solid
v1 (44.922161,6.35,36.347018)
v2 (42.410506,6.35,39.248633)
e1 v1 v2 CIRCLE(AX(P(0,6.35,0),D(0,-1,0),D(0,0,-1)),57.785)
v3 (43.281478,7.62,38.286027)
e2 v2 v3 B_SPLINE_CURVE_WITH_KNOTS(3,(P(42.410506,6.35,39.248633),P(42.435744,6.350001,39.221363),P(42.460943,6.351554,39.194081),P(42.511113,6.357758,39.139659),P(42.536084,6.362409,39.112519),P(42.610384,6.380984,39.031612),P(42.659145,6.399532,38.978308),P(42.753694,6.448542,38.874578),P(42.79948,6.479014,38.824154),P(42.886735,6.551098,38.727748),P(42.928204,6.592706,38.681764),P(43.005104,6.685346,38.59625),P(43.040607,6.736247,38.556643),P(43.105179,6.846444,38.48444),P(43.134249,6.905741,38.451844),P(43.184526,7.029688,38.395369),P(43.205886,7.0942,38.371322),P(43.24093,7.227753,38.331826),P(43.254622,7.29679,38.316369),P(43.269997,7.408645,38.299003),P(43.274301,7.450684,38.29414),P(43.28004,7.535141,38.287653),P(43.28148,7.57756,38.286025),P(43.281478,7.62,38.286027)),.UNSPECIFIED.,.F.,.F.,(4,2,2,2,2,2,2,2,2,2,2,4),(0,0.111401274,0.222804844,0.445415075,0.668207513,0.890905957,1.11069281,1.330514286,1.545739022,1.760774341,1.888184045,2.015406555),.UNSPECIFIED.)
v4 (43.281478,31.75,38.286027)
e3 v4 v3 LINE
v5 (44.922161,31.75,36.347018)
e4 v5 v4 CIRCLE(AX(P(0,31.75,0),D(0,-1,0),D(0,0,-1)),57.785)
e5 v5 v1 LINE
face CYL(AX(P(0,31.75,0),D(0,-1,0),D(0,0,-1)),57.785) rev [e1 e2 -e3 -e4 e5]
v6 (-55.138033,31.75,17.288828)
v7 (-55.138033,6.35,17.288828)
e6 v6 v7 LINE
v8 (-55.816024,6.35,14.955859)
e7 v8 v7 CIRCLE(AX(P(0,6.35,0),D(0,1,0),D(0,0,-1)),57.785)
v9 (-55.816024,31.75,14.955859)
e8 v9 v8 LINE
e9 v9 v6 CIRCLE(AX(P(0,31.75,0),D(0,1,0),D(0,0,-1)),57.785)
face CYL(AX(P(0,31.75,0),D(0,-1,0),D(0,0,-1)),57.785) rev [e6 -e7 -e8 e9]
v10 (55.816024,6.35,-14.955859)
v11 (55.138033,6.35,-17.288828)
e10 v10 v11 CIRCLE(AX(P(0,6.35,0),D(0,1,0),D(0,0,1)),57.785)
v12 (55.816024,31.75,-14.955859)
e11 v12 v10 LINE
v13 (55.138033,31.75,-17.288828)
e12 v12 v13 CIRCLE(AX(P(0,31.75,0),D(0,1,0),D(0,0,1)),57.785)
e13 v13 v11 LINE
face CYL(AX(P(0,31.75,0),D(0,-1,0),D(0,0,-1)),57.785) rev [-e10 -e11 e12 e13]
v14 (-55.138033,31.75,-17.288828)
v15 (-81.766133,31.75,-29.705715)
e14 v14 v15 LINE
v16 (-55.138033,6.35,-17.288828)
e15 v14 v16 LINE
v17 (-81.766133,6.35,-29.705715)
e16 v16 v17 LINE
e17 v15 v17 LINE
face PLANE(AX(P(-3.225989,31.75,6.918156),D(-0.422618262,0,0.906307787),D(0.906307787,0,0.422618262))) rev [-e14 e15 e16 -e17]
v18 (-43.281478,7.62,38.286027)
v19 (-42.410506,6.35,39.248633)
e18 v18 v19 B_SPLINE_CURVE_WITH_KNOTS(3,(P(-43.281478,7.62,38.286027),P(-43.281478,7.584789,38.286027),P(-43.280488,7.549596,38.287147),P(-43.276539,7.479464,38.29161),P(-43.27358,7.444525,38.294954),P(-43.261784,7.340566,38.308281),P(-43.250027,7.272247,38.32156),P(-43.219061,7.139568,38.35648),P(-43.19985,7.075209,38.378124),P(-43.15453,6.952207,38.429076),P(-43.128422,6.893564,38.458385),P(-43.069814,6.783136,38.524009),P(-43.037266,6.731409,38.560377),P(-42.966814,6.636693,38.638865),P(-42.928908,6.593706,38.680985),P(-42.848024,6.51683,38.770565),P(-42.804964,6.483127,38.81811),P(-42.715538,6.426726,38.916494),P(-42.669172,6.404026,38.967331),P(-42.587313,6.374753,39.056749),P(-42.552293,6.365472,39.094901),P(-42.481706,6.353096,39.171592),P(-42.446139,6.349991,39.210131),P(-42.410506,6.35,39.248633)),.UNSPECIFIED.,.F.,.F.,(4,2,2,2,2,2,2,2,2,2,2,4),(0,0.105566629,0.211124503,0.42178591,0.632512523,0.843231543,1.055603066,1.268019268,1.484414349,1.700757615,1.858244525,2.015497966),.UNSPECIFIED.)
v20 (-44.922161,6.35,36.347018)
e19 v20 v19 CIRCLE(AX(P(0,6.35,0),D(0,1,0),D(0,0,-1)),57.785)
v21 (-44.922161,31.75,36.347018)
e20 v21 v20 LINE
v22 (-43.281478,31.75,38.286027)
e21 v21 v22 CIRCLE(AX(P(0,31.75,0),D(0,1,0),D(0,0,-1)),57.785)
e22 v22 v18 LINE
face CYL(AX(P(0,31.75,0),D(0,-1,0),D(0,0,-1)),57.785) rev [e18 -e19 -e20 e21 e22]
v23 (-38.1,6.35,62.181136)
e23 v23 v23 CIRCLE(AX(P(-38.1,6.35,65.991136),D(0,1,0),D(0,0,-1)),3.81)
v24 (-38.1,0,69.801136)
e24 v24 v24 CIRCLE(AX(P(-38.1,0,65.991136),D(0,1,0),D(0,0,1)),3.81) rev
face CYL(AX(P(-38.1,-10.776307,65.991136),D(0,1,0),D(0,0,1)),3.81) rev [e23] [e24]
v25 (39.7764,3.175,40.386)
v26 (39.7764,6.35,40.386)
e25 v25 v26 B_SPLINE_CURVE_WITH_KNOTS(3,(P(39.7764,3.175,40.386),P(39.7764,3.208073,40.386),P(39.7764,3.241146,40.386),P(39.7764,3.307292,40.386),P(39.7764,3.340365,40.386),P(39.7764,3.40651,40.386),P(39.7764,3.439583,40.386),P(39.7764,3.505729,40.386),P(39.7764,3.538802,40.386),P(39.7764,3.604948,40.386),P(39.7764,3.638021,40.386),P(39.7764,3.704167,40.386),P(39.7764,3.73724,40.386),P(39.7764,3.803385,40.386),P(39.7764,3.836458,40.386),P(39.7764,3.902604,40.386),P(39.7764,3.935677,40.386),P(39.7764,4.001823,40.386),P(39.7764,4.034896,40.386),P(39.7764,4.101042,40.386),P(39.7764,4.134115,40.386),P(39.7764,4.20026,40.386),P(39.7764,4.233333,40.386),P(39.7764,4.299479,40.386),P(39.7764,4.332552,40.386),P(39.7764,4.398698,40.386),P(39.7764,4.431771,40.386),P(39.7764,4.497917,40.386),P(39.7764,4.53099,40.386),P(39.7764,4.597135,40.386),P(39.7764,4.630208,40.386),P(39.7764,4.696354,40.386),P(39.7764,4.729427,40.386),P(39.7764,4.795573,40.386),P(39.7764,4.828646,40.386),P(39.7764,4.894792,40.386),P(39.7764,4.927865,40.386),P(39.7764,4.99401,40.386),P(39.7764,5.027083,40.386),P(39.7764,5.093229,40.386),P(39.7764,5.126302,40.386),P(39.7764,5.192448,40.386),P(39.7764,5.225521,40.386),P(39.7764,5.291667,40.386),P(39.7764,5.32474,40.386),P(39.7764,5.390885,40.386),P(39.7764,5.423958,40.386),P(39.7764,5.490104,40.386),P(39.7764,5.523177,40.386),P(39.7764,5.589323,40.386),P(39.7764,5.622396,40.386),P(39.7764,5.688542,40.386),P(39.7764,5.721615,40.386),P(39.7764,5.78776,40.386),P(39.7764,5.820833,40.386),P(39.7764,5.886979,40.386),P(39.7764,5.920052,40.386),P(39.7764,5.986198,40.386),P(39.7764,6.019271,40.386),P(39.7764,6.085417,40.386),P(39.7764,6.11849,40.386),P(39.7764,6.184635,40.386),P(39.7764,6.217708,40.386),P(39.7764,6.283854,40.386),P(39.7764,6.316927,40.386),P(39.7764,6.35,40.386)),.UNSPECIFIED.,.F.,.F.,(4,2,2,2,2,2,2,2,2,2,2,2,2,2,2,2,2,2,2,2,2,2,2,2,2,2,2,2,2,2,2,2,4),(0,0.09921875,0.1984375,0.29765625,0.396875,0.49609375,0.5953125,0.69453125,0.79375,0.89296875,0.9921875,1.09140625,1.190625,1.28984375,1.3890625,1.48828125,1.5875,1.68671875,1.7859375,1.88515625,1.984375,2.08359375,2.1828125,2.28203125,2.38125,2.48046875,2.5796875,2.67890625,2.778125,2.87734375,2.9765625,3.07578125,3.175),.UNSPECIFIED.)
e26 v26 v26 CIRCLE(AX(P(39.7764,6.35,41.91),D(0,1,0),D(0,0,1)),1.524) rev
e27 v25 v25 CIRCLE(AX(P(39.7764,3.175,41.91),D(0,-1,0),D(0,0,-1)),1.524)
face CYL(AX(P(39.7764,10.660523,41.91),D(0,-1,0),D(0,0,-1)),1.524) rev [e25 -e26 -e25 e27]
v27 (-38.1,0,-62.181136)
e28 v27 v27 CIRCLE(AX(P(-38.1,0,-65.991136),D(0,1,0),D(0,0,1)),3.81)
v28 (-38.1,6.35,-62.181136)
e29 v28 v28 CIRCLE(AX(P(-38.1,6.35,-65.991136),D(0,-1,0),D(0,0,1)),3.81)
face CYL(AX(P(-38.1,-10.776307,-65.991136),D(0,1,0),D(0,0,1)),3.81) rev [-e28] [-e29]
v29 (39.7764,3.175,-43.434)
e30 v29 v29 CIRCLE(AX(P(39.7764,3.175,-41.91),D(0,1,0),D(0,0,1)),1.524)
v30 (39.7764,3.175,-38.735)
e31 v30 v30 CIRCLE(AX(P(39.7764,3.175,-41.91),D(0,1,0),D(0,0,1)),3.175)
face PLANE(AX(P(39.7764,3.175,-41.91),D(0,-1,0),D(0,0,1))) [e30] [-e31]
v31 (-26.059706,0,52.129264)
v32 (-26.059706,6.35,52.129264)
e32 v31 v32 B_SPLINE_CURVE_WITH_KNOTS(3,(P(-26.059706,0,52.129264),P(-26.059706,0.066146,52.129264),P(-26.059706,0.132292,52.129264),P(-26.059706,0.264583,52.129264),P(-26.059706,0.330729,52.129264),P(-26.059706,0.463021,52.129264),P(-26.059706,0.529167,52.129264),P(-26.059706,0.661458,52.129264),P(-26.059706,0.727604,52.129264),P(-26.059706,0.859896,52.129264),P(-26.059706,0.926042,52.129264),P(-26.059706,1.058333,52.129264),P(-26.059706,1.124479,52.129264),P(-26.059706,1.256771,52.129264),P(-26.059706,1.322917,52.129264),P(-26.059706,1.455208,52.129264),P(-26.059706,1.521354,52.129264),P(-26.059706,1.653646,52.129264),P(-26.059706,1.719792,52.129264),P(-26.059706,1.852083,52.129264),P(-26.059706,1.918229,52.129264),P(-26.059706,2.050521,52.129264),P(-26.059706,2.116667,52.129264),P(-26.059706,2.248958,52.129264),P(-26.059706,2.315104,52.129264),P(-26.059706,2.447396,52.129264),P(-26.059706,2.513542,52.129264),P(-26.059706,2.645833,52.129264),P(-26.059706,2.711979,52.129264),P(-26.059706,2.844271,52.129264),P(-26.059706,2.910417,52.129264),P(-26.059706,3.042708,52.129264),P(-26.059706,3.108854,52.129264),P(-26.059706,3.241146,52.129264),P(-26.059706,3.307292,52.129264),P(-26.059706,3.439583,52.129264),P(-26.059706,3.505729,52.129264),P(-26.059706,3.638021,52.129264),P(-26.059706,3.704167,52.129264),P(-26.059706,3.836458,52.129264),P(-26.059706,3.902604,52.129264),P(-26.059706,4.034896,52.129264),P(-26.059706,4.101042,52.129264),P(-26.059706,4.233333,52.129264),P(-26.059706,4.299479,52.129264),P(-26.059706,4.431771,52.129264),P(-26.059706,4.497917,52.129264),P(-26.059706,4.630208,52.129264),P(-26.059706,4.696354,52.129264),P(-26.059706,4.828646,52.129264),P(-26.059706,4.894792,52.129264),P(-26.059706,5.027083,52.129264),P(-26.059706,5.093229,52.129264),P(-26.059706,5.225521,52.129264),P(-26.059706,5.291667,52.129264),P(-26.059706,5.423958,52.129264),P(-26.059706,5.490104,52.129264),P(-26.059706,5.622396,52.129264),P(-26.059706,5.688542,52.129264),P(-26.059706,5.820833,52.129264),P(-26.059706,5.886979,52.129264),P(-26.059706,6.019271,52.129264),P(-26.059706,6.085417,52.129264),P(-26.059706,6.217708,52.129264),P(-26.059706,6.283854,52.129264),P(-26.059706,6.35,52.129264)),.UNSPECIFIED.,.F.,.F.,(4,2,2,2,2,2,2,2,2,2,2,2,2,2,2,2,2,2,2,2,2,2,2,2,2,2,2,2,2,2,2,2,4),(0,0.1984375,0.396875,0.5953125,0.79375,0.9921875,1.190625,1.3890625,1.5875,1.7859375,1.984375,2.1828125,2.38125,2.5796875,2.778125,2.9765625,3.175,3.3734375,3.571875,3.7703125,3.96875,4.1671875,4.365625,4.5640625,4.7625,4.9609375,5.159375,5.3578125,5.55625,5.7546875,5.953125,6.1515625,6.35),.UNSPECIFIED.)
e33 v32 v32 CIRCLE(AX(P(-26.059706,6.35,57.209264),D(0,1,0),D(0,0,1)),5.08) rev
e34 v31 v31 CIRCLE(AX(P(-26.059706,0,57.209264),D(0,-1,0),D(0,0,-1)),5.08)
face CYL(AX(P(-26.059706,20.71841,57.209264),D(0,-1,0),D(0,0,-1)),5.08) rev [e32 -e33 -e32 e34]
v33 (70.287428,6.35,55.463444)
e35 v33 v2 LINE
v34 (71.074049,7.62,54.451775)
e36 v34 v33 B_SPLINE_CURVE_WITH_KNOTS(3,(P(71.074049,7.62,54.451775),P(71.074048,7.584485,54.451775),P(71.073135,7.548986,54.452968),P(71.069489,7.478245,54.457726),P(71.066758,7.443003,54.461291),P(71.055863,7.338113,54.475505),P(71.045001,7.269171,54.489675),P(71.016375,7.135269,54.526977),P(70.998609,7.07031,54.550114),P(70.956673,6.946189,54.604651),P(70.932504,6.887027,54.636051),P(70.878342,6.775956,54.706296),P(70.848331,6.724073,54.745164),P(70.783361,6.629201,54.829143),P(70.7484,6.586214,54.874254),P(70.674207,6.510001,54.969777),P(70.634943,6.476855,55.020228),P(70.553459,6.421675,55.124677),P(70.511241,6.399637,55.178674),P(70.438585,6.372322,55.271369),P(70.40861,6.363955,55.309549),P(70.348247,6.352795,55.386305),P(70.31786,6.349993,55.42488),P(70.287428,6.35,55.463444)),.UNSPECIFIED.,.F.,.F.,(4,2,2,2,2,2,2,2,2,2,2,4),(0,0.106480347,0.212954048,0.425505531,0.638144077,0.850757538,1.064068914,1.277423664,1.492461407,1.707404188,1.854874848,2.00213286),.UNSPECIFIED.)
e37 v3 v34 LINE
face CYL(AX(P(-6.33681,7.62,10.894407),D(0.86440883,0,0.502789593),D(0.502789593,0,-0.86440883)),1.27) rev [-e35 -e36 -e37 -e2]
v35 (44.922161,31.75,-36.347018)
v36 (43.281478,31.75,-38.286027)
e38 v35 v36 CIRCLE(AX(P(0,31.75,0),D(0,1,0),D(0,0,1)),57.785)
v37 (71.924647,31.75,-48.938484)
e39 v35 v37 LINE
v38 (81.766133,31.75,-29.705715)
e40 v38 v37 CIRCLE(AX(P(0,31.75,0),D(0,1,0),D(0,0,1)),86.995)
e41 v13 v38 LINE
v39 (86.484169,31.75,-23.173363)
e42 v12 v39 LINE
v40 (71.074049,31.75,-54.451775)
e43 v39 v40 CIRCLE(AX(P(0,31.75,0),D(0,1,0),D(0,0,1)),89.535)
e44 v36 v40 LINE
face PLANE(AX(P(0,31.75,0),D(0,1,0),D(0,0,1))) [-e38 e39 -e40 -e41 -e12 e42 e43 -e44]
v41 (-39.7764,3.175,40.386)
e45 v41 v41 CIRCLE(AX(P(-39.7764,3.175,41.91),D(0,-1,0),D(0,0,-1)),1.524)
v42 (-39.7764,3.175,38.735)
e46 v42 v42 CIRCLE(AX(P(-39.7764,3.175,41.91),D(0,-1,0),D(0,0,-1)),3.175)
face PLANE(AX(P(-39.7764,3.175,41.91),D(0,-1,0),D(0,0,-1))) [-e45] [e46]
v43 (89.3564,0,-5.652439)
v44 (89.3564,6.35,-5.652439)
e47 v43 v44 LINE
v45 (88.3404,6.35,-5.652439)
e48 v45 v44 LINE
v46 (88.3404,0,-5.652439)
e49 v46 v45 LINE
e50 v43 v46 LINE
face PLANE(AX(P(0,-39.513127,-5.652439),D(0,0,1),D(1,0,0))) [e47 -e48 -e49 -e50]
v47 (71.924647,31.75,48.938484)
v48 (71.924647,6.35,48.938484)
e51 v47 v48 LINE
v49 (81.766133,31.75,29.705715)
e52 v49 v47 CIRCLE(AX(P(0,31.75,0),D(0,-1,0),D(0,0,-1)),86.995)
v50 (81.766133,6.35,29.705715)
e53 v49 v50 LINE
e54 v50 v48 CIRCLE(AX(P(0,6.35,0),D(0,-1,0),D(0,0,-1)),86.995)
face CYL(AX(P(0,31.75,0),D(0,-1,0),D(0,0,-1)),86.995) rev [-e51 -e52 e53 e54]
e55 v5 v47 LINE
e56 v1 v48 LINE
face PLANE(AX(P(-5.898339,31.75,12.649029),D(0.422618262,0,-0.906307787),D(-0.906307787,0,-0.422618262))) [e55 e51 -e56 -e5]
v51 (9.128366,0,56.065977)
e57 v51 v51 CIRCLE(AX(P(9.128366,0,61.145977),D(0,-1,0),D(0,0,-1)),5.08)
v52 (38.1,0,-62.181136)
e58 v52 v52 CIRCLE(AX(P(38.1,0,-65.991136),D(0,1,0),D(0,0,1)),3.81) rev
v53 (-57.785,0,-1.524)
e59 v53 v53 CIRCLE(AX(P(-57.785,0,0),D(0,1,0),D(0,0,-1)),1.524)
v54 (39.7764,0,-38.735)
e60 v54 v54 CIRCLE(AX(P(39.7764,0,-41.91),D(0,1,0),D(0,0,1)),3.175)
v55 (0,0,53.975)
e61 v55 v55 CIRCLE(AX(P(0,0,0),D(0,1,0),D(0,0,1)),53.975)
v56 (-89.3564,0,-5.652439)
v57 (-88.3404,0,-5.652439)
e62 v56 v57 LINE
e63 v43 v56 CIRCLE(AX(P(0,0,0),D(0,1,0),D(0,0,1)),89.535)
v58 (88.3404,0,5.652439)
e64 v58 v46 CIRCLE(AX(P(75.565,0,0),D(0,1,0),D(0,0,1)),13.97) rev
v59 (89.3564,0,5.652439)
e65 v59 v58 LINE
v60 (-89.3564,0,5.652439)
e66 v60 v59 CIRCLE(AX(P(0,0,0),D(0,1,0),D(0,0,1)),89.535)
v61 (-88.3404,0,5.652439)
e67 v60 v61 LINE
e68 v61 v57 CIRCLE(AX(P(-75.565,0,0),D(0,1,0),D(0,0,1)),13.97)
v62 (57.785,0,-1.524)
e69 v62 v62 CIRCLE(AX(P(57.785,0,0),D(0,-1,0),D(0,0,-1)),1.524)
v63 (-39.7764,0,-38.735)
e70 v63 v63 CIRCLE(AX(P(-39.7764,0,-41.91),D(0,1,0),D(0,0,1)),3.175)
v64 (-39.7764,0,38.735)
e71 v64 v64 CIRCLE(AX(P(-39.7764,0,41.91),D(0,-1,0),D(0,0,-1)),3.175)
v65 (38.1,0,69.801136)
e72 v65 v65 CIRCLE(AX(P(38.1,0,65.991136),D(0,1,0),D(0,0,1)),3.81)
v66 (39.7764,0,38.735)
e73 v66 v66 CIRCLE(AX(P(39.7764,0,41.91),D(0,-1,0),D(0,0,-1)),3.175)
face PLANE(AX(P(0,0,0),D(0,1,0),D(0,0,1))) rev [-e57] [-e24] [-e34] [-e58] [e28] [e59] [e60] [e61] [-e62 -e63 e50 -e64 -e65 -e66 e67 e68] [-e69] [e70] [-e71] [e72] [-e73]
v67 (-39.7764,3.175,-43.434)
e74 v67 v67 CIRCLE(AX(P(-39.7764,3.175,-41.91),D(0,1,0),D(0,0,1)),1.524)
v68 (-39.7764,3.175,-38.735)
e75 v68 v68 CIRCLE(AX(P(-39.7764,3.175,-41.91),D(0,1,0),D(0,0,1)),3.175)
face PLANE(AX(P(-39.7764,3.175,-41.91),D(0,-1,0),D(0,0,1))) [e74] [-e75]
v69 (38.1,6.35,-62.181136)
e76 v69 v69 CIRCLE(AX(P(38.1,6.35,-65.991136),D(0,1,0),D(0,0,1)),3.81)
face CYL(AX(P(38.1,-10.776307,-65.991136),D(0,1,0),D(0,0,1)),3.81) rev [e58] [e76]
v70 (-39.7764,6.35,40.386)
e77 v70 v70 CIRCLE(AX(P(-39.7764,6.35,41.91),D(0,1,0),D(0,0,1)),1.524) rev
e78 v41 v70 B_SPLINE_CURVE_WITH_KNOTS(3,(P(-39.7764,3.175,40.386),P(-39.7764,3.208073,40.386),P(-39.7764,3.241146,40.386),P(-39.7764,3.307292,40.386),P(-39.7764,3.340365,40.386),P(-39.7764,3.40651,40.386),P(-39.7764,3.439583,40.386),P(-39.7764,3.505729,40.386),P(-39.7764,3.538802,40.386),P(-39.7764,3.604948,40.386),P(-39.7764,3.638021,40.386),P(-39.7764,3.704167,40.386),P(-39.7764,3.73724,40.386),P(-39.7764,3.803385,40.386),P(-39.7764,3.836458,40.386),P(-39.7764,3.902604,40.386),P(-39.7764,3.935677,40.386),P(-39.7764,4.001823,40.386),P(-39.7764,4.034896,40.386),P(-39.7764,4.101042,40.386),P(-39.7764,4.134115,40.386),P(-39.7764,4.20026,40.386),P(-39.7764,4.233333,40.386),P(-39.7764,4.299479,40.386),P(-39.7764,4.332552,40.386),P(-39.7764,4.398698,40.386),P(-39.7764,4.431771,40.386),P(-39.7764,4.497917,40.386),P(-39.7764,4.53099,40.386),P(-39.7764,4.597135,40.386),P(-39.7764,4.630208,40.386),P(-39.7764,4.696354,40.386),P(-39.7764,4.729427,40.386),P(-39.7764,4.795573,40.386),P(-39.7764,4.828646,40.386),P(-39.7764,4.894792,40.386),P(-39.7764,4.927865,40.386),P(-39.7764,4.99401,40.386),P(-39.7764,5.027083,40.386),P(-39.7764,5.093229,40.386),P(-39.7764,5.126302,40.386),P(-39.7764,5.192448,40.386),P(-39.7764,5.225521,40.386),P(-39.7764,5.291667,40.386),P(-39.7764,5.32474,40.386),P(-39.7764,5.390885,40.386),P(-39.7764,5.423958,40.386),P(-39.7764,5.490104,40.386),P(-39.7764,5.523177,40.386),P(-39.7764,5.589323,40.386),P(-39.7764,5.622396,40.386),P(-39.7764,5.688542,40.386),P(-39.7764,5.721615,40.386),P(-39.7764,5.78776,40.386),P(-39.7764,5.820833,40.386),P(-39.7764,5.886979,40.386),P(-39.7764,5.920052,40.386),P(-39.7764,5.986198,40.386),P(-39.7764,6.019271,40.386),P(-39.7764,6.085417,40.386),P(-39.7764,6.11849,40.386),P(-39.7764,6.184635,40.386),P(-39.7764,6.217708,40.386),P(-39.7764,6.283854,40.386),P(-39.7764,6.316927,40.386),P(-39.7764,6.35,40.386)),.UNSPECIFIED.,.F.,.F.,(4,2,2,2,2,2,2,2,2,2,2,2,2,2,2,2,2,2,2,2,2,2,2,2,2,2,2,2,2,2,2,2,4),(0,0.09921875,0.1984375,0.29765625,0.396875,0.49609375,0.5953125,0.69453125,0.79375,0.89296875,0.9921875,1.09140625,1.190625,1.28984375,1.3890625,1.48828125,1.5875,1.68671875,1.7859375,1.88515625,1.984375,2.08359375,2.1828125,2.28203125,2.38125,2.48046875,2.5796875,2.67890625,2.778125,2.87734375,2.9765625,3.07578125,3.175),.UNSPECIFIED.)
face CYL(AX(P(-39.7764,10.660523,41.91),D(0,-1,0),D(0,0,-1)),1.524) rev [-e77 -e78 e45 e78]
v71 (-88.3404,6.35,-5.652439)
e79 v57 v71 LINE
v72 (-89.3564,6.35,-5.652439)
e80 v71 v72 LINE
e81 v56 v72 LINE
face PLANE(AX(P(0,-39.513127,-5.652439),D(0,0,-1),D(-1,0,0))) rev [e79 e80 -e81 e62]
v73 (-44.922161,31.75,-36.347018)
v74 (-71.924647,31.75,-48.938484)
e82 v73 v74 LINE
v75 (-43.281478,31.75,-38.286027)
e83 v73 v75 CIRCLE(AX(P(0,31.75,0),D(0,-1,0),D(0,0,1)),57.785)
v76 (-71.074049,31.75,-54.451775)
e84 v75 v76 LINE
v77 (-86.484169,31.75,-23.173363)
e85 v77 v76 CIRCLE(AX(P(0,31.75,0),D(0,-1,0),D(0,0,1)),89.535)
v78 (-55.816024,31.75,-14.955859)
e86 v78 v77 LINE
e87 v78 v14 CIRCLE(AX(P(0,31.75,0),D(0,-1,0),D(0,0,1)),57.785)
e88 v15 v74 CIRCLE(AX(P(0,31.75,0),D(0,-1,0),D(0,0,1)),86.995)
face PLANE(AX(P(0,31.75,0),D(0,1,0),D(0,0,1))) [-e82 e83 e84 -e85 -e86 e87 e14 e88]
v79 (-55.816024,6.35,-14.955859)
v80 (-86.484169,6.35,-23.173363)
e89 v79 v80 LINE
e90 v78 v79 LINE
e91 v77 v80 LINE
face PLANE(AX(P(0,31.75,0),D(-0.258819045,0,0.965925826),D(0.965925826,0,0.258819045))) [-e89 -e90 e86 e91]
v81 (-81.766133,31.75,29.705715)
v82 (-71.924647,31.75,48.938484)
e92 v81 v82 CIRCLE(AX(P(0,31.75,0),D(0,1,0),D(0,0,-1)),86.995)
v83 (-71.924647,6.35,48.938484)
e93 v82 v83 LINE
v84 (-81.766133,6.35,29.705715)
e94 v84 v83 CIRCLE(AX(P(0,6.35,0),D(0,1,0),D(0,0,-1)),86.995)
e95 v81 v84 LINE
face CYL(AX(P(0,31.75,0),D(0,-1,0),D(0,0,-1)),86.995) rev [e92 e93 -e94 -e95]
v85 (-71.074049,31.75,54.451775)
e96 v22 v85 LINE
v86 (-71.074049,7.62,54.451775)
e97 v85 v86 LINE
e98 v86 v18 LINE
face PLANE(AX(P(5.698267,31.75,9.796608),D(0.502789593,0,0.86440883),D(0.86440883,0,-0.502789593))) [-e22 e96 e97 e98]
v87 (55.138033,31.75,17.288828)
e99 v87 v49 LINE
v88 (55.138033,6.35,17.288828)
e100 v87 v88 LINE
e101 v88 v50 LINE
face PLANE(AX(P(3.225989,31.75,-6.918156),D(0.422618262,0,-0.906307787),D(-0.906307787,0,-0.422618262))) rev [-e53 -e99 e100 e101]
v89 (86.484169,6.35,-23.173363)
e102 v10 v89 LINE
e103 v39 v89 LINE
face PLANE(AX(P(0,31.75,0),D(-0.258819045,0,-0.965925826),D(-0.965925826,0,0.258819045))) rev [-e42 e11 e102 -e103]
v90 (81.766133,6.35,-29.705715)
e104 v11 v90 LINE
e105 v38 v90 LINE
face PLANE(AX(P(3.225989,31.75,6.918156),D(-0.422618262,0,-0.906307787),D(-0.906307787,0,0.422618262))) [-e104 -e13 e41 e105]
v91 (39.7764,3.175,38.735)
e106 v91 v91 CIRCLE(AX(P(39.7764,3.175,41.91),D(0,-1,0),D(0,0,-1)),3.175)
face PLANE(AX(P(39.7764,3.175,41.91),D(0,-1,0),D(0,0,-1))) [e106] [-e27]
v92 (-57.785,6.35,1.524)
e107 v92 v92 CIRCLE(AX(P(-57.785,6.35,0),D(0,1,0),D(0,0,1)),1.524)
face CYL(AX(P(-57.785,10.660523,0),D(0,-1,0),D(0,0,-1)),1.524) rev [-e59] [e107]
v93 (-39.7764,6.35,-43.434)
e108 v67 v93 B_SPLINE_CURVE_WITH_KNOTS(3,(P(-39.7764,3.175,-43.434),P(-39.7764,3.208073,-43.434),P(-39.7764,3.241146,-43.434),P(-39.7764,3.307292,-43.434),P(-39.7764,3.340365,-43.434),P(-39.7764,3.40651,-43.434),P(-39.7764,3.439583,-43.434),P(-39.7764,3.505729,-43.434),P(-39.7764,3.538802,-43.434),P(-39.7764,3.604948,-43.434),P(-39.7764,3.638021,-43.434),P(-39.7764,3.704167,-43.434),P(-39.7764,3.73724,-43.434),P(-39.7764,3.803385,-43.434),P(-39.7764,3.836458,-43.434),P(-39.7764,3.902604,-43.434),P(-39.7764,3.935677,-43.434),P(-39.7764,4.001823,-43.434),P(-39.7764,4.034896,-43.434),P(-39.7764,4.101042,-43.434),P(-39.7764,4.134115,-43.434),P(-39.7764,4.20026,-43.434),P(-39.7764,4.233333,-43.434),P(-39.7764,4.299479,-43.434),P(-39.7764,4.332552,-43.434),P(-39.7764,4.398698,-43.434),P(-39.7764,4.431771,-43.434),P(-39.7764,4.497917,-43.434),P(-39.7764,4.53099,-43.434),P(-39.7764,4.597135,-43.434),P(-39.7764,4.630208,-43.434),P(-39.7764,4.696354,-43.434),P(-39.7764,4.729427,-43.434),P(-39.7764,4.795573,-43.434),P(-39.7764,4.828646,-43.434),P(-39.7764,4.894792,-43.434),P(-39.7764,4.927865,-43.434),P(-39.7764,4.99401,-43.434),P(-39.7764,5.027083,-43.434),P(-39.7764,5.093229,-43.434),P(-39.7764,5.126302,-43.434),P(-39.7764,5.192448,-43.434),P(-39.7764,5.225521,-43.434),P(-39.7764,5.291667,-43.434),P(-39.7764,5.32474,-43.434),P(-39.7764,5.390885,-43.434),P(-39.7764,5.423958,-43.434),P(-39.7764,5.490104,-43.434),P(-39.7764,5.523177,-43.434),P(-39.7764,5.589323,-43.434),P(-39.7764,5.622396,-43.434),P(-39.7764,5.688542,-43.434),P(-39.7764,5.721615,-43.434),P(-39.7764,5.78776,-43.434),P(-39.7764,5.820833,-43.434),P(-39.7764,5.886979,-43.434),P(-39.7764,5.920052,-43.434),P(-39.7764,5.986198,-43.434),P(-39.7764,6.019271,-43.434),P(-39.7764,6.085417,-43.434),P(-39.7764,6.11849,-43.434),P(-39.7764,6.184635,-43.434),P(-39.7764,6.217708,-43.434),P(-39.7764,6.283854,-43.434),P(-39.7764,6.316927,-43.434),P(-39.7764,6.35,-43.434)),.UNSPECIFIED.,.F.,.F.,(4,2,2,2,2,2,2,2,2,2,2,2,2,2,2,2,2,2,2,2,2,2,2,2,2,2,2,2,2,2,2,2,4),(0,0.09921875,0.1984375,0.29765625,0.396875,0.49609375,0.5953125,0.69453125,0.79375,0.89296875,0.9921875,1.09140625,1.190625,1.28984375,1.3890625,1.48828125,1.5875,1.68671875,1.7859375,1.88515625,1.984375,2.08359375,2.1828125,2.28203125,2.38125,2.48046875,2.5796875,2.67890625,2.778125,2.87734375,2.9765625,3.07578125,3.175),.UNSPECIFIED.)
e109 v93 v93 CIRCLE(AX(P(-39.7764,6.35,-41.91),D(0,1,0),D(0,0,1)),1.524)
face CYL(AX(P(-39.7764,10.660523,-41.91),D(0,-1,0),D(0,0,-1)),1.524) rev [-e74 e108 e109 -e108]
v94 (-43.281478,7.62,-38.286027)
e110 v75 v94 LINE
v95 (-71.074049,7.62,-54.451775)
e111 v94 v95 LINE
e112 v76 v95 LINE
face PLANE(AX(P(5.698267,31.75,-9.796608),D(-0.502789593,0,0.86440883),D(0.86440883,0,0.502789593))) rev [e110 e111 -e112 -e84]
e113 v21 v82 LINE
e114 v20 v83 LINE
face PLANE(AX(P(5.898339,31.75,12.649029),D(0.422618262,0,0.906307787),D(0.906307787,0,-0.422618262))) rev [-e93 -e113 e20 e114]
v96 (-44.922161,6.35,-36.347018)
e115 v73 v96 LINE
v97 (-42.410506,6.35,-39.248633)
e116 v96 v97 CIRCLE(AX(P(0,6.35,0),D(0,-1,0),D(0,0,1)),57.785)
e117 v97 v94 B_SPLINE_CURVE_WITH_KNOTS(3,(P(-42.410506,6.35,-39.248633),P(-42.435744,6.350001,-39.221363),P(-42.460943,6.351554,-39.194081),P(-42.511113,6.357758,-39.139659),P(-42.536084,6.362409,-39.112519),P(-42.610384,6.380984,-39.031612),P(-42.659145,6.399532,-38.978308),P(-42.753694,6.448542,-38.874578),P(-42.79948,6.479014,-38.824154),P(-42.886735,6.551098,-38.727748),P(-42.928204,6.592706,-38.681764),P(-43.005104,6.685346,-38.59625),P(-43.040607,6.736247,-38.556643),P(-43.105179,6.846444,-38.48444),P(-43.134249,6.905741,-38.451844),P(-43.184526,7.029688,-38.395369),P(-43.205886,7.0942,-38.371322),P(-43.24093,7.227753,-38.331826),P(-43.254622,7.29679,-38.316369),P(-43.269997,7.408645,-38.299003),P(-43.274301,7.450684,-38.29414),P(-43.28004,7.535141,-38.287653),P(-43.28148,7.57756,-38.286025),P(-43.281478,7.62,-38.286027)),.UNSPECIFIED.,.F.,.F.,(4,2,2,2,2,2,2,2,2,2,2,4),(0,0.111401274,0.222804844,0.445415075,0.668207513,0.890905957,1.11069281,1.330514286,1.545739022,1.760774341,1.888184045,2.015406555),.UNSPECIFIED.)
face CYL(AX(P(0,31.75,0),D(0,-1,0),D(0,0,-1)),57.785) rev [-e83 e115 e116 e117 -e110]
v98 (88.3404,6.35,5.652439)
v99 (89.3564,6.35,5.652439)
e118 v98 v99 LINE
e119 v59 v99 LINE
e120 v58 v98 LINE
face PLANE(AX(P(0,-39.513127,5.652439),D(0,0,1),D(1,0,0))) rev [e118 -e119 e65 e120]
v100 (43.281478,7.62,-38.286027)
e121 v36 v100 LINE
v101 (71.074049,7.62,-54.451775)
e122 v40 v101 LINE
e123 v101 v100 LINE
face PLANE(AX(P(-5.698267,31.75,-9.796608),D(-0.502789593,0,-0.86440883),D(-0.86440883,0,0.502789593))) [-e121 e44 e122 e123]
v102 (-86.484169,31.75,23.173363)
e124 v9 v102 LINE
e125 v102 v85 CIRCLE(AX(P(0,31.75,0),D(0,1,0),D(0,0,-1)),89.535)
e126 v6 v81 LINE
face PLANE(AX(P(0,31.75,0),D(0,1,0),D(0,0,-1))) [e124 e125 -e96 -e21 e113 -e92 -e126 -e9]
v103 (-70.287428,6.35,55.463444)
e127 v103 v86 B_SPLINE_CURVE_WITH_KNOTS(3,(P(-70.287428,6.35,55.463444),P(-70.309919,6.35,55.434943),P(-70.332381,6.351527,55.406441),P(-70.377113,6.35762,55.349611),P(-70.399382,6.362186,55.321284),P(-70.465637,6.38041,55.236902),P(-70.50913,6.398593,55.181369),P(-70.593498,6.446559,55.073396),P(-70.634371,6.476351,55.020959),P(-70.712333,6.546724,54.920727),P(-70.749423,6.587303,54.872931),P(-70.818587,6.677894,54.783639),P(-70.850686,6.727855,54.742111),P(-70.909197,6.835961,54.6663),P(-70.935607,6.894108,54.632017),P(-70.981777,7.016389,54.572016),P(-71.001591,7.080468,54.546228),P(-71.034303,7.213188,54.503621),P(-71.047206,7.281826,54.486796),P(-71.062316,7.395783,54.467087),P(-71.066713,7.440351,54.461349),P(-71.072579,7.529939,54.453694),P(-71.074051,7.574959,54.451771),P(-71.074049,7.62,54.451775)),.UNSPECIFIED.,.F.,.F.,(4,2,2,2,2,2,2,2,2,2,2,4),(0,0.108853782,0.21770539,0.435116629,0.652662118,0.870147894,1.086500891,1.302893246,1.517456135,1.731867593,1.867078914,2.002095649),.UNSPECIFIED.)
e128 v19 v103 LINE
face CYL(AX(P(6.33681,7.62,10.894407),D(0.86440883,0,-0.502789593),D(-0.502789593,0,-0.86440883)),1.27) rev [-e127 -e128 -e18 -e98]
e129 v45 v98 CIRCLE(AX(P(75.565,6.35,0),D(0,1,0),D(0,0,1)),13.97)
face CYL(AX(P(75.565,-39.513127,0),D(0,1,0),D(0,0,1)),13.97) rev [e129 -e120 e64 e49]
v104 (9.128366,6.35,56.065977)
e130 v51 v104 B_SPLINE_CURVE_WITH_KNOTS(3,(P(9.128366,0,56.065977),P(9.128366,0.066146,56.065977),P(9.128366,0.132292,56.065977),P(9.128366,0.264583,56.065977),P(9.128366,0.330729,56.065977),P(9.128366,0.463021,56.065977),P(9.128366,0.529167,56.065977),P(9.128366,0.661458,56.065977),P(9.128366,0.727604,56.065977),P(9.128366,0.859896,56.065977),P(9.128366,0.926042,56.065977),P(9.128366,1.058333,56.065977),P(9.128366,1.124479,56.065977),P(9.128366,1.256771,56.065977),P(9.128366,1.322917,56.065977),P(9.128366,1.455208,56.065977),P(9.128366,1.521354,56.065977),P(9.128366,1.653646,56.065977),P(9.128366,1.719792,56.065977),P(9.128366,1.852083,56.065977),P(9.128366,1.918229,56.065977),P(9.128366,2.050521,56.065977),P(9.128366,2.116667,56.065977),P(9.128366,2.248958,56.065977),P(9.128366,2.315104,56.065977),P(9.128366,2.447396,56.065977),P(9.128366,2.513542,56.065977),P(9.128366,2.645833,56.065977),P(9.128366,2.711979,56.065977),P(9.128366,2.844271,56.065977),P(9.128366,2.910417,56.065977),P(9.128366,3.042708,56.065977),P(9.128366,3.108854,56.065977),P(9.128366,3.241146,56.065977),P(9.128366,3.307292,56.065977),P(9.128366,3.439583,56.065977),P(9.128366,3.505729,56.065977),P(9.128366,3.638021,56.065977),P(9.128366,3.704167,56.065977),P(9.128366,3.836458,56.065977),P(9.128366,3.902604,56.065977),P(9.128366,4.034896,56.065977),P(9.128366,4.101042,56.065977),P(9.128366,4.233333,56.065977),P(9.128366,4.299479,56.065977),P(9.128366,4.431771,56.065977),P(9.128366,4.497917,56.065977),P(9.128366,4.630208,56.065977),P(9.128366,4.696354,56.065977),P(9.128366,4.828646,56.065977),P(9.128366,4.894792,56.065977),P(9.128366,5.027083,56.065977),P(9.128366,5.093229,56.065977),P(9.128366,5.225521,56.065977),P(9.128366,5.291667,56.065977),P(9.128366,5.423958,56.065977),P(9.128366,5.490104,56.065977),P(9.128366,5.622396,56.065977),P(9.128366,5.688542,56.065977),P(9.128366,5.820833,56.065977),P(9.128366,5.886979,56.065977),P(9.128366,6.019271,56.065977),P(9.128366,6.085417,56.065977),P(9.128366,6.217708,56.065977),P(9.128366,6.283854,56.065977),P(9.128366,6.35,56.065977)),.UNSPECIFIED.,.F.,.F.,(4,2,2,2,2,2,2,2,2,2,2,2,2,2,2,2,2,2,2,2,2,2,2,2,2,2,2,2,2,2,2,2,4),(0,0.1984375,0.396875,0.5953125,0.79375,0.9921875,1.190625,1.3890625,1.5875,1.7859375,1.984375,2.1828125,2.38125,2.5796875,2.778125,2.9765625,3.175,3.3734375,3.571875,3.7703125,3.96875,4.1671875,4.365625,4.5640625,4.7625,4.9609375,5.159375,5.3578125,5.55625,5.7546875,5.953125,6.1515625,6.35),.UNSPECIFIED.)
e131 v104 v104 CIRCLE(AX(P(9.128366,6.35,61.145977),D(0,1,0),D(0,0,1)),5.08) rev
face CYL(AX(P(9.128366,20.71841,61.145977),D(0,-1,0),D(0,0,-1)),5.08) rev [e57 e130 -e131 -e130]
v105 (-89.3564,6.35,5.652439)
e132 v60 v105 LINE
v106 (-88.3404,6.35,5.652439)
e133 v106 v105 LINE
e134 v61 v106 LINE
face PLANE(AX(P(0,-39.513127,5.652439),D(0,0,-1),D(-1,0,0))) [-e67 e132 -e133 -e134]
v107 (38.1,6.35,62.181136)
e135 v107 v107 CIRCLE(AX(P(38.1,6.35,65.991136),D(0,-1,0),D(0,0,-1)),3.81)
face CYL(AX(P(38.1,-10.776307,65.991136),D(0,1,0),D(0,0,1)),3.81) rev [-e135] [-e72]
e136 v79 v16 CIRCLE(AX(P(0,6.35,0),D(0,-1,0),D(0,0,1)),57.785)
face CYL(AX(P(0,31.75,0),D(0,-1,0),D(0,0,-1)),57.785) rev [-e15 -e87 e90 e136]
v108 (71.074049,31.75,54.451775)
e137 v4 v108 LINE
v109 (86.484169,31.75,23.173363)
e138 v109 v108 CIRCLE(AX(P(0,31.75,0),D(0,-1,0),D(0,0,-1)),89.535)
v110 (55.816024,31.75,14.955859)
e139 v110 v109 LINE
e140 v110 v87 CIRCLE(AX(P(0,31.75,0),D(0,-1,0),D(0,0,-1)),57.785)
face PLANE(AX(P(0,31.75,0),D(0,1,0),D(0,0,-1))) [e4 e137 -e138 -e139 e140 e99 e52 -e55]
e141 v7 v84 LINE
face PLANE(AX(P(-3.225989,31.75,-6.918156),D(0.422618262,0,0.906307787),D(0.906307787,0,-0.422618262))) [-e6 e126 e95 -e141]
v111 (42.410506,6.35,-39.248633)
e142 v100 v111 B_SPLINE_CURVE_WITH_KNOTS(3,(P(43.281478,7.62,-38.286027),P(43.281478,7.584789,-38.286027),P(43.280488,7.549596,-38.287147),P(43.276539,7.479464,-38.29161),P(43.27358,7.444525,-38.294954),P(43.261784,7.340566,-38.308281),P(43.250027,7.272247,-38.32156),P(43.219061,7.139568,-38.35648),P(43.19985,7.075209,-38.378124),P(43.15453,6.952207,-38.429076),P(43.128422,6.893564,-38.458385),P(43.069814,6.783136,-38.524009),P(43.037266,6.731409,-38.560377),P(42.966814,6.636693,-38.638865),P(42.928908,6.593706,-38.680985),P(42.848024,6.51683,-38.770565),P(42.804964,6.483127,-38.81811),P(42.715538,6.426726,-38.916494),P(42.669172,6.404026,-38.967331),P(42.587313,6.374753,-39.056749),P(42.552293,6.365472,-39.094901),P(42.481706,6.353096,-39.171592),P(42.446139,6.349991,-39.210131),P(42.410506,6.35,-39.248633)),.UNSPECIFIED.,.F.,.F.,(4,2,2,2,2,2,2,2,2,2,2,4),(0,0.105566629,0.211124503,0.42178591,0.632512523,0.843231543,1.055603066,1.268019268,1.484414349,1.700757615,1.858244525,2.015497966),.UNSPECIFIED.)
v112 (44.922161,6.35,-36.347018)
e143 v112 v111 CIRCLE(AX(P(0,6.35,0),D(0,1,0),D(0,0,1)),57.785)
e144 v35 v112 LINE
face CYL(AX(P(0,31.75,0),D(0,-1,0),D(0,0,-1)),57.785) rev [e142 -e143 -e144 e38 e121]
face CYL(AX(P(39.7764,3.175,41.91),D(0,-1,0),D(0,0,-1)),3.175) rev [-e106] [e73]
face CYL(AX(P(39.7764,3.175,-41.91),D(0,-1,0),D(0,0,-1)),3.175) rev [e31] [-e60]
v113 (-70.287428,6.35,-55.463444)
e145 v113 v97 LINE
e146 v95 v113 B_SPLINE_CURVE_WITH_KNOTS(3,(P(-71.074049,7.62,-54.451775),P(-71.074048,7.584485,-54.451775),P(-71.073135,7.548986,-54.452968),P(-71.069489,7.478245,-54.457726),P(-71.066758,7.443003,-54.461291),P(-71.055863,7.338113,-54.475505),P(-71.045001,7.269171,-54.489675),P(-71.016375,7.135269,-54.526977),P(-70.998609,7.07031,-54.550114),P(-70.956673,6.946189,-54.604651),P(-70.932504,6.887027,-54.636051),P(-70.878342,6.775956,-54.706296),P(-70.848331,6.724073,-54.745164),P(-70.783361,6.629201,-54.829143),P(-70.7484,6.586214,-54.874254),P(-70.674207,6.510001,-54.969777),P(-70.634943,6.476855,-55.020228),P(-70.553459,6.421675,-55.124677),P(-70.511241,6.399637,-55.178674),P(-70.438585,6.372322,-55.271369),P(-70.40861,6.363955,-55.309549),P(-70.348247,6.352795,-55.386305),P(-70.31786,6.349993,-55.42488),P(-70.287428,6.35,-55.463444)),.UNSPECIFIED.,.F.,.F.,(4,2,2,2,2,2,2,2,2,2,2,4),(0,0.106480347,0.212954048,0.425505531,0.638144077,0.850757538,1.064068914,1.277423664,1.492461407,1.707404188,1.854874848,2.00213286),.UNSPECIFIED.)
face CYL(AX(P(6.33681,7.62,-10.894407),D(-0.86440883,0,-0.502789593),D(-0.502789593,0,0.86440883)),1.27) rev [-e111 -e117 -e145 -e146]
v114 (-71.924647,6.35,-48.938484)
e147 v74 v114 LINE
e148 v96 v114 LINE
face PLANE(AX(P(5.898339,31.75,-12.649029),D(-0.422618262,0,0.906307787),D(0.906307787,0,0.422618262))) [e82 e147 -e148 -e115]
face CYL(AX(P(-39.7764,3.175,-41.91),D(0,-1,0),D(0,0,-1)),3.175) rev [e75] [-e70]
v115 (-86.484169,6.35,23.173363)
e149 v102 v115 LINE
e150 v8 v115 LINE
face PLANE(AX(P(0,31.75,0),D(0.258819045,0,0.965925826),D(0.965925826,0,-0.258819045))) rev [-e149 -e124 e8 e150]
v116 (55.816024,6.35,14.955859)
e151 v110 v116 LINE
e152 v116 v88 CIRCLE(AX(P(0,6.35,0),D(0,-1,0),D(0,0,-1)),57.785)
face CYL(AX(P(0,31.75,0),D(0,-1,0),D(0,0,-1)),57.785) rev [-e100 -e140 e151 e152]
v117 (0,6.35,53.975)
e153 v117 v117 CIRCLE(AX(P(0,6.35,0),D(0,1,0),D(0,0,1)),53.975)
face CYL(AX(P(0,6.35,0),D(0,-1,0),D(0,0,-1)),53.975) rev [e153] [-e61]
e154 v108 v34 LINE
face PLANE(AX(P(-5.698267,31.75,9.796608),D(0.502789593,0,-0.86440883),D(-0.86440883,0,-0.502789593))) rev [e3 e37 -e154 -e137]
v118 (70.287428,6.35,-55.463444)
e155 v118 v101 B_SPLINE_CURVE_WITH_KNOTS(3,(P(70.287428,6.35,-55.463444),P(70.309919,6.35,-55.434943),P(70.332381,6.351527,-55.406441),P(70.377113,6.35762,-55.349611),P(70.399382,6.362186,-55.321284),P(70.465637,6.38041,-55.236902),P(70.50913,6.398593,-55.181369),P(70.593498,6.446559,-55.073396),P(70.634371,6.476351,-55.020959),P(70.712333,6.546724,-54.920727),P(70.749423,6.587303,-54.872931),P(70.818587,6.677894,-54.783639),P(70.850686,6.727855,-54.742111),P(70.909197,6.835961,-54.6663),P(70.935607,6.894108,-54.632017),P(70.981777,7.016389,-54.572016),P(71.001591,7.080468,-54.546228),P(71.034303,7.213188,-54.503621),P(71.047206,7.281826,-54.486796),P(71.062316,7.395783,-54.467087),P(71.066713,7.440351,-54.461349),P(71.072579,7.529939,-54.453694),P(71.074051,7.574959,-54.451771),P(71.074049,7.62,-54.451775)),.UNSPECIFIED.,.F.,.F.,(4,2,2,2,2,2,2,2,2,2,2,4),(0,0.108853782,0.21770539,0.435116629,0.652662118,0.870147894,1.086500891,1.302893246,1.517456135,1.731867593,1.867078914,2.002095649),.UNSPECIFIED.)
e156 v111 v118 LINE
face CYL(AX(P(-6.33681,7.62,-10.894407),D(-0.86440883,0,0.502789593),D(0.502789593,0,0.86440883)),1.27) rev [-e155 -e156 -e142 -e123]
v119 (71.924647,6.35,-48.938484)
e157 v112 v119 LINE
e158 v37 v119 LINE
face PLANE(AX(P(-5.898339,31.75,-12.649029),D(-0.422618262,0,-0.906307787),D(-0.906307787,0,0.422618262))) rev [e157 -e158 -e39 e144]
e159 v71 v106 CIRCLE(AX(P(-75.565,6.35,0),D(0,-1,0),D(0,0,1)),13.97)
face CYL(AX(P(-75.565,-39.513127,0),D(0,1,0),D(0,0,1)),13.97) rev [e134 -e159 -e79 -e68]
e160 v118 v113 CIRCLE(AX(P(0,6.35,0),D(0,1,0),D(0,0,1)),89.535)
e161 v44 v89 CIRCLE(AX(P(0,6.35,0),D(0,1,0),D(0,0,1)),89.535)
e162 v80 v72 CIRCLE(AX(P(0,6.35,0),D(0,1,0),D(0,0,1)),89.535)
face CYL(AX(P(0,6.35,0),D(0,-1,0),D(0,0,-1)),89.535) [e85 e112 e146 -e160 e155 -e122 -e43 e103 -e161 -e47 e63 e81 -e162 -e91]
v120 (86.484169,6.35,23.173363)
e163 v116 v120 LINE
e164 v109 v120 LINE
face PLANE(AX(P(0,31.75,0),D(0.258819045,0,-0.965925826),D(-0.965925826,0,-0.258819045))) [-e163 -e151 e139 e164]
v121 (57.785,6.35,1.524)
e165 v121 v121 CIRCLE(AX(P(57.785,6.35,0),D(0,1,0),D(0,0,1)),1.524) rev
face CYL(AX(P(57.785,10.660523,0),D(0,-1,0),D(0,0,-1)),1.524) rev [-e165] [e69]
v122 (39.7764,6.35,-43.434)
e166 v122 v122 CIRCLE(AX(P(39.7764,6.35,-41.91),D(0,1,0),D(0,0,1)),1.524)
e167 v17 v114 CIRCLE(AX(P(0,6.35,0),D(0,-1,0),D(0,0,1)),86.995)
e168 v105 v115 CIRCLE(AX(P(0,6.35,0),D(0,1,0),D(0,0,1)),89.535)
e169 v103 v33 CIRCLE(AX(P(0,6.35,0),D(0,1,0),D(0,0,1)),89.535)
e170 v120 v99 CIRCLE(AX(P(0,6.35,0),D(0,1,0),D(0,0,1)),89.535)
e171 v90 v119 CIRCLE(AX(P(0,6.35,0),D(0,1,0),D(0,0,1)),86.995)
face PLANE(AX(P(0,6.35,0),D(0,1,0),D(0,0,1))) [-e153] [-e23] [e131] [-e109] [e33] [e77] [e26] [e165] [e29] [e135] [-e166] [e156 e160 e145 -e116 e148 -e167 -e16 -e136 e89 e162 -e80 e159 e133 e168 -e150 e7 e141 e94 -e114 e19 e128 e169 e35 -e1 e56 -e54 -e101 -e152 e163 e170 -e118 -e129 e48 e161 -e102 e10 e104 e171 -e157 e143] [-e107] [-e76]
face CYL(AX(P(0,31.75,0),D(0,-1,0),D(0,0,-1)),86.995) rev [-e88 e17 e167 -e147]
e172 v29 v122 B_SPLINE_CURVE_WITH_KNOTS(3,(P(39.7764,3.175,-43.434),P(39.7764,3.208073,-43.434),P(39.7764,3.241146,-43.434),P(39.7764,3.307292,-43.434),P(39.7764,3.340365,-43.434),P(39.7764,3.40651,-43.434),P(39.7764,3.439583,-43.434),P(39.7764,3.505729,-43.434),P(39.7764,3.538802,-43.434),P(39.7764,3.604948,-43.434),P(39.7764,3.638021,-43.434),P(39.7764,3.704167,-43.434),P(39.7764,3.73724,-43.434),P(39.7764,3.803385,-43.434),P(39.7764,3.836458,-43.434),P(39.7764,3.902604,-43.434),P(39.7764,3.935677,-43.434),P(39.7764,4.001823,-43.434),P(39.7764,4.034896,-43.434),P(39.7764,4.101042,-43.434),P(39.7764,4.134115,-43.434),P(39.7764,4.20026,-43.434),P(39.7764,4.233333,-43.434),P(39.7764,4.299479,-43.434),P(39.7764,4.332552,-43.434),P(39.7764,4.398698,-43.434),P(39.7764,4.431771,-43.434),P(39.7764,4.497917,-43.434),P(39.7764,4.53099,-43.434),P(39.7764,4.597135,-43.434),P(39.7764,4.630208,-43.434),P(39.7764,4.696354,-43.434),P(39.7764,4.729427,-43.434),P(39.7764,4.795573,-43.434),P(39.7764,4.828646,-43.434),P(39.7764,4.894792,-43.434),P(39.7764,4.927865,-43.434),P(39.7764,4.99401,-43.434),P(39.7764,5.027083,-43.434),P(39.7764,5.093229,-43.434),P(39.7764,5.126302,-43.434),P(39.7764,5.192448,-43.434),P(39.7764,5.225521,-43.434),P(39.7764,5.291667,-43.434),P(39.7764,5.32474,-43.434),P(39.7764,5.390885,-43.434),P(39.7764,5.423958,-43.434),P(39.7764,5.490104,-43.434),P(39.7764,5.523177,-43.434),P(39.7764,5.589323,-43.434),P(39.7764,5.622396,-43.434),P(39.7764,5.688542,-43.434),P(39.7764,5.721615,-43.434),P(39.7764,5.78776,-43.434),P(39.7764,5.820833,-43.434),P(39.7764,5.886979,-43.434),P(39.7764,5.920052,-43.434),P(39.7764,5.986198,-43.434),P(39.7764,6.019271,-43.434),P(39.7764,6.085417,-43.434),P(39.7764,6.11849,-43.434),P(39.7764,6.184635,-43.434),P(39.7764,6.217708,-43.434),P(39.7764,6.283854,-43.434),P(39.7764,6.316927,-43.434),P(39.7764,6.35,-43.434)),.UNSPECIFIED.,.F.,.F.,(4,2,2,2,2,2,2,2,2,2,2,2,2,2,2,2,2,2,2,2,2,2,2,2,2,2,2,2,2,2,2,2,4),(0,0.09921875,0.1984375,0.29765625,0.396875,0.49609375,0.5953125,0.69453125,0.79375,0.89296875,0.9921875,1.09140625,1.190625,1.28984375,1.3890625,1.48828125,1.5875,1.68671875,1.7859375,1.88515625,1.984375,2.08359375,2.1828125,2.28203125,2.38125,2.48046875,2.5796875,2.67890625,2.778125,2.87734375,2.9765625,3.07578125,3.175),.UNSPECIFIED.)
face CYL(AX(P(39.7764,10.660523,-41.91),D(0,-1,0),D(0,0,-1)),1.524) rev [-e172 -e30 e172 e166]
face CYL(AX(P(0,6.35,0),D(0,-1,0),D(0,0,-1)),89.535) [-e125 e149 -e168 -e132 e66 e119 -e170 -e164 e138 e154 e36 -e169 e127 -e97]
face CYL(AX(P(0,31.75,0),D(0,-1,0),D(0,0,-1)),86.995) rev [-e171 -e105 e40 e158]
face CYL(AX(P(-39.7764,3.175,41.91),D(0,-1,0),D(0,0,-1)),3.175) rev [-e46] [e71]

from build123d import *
from build123d.topology import SkipClean

# Parameters (mm, degrees)
SKETCH1_R                     = 89.535
SKETCH1_R_2                   = 53.975
BASE_DEPTH                    = 6.35
NOCE_START                    = -6.35
NOCE_CONE_PYROS_DEPTH         = 6.35
BATTERY_1_HOLDER_DEPTH        = 25.4
BATTERY_4_HOLDER_COPY_1_DEPTH = 25.4
BATTERY_4_HOLDER_COPY_2_DEPTH = 25.4
SKETCH4_R                     = 3.81
BOLT_HOLE_DEPTH               = 6.35
BOLT_HOLE_4_COPY_1_SKETCH_R   = 3.81
BOLT_HOLE_4_COPY_1_DEPTH      = 6.35
BOLT_HOLE_4_COPY_2_SKETCH_R   = 3.81
BOLT_HOLE_4_COPY_2_DEPTH      = 6.35
SKETCH11_R                    = 5.08
CUT_EXTRUDE2_DEPTH            = 6.35
SKETCH13_R                    = 3.175
CUT_EXTRUDE3_DEPTH            = 3.175
SKETCH14_R                    = 1.524
CUT_EXTRUDE4_DEPTH            = 3.175
FILLET3_R                     = 1.27
SKETCH15_R                    = 1.524
CUT_EXTRUDE5_DEPTH            = 6.35


with BuildPart() as part:
    # Sketch1 → Base (new body)
    with BuildSketch(Plane(origin=(0, 0, 0), x_dir=(1, 0, 0), z_dir=(0, 1, 0))):
        with Locations(Location((0, 0, 0), (0, 0, 270))):
            Circle(SKETCH1_R)
        with Locations(Location((0, 0, 0), (0, 0, 270))):
            Circle(SKETCH1_R_2, mode=Mode.SUBTRACT)
    extrude(amount=BASE_DEPTH)

    # Sketch2 → Noce Cone Pyros (cut)
    with BuildSketch(Plane(origin=(0, 6.35, 0), x_dir=(1, 0, 0), z_dir=(0, 1, 0)).offset(NOCE_START)):
        with BuildLine():
            Line((89.3564, 5.652439), (88.3404, 5.652439))
            ThreePointArc((88.3404, 5.652439), (61.595, 0), (88.3404, -5.652439))
            Line((88.3404, -5.652439), (89.3564, -5.652439))
            ThreePointArc((89.3564, -5.652439), (89.490339, -2.82763), (89.535, 0))
            ThreePointArc((89.535, 0), (89.490339, 2.82763), (89.3564, 5.652439))
        make_face()
    noce_cone_pyros = extrude(amount=NOCE_CONE_PYROS_DEPTH, mode=Mode.SUBTRACT)

    # Nose Cone Pyro mirror: Noce Cone Pyros across plane
    add(noce_cone_pyros.mirror(Plane(origin=(0, 0, 0), x_dir=(0, 0, 1), z_dir=(1, 0, 0))), mode=Mode.SUBTRACT)

    # Sketch3 → Battery 1 Holder (add)
    with BuildSketch(Plane(origin=(0, 6.35, 0), x_dir=(1, 0, 0), z_dir=(0, 1, 0))):
        with BuildLine():
            ThreePointArc((55.138033, 17.288828), (55.489291, 16.125907), (55.816024, 14.955859))
            Line((55.816024, 14.955859), (86.484169, 23.173363))
            ThreePointArc((86.484169, 23.173363), (80.316454, 39.569982), (71.074049, 54.451775))
            Line((71.074049, 54.451775), (43.281478, 38.286027))
            ThreePointArc((43.281478, 38.286027), (44.112475, 37.325538), (44.922161, 36.347018))
            Line((44.922161, 36.347018), (71.924647, 48.938484))
            ThreePointArc((71.924647, 48.938484), (77.444747, 39.628792), (81.766133, 29.705715))
            Line((81.766133, 29.705715), (55.138033, 17.288828))
        make_face()
    battery_1_holder = extrude(amount=BATTERY_1_HOLDER_DEPTH)

    # Batery 2 Holder: Battery 1 Holder across plane
    add(battery_1_holder.mirror(Plane.XY))

    # Battery 3 Holder: Battery 1 Holder across plane
    with SkipClean():  # the faces are left unmerged after this step: merging them gives an invalid solid
        add(battery_1_holder.mirror(Plane(origin=(0, 0, 0), x_dir=(0, 0, 1), z_dir=(1, 0, 0))))

    # Battery 4 Holder copy 1 sketch → Battery 4 Holder copy 1 (add)
    with SkipClean():  # the faces are left unmerged after this step: merging them gives an invalid solid
        with BuildSketch(Plane(origin=(0, 6.35, 0), x_dir=(-1, 0, 0), z_dir=(0, 1, 0))):
            with BuildLine():
                ThreePointArc((55.138033, 17.288828), (55.489291, 16.125907), (55.816024, 14.955859))
                Line((55.816024, 14.955859), (86.484169, 23.173363))
                ThreePointArc((86.484169, 23.173363), (80.316454, 39.569982), (71.074049, 54.451775))
                Line((71.074049, 54.451775), (43.281478, 38.286027))
                ThreePointArc((43.281478, 38.286027), (44.112475, 37.325538), (44.922161, 36.347018))
                Line((44.922161, 36.347018), (71.924647, 48.938484))
                ThreePointArc((71.924647, 48.938484), (77.444747, 39.628792), (81.766133, 29.705715))
                Line((81.766133, 29.705715), (55.138033, 17.288828))
            make_face()
        extrude(amount=BATTERY_4_HOLDER_COPY_1_DEPTH)

    # Battery 4 Holder copy 2 sketch → Battery 4 Holder copy 2 (add)
    with SkipClean():  # the faces are left unmerged after this step: merging them gives an invalid solid
        with BuildSketch(Plane(origin=(0, 6.35, 0), x_dir=(-1, 0, 0), z_dir=(0, 1, 0))):
            with BuildLine():
                ThreePointArc((55.138033, -17.288828), (55.489291, -16.125907), (55.816024, -14.955859))
                Line((55.816024, -14.955859), (86.484169, -23.173363))
                ThreePointArc((86.484169, -23.173363), (80.316454, -39.569982), (71.074049, -54.451775))
                Line((71.074049, -54.451775), (43.281478, -38.286027))
                ThreePointArc((43.281478, -38.286027), (44.112475, -37.325538), (44.922161, -36.347018))
                Line((44.922161, -36.347018), (71.924647, -48.938484))
                ThreePointArc((71.924647, -48.938484), (77.444747, -39.628792), (81.766133, -29.705715))
                Line((81.766133, -29.705715), (55.138033, -17.288828))
            make_face()
        extrude(amount=BATTERY_4_HOLDER_COPY_2_DEPTH)

    # Sketch4 → Bolt Hole (cut)
    with SkipClean():  # the faces are left unmerged after this step: merging them gives an invalid solid
        with BuildSketch(Plane(origin=(0, 6.35, 0), x_dir=(1, 0, 0), z_dir=(0, 1, 0))):
            with Locations(Location((38.1, 65.991136, 0), (0, 0, 270))):
                Circle(SKETCH4_R)
        bolt_hole = extrude(amount=-BOLT_HOLE_DEPTH, mode=Mode.SUBTRACT)

    # Bolt Hole 2: Bolt Hole across plane
    with SkipClean():  # the faces are left unmerged after this step: merging them gives an invalid solid
        add(bolt_hole.mirror(Plane.XY), mode=Mode.SUBTRACT)

    # Bolt Hole 3: Bolt Hole across plane
    with SkipClean():  # the faces are left unmerged after this step: merging them gives an invalid solid
        add(bolt_hole.mirror(Plane(origin=(0, 0, 0), x_dir=(0, 0, 1), z_dir=(1, 0, 0))), mode=Mode.SUBTRACT)

    # Bolt Hole 4 copy 1 sketch → Bolt Hole 4 copy 1 (cut)
    with SkipClean():  # the faces are left unmerged after this step: merging them gives an invalid solid
        with BuildSketch(Plane(origin=(0, 6.35, 0), x_dir=(-1, 0, 0), z_dir=(0, 1, 0))):
            with Locations(Location((38.1, 65.991136, 0), (0, 0, 270))):
                Circle(BOLT_HOLE_4_COPY_1_SKETCH_R)
        extrude(amount=-BOLT_HOLE_4_COPY_1_DEPTH, mode=Mode.SUBTRACT)

    # Bolt Hole 4 copy 2 sketch → Bolt Hole 4 copy 2 (cut)
    with SkipClean():  # the faces are left unmerged after this step: merging them gives an invalid solid
        with BuildSketch(Plane(origin=(0, 6.35, 0), x_dir=(-1, 0, 0), z_dir=(0, 1, 0))):
            with Locations((38.1, -65.991136)):
                Circle(BOLT_HOLE_4_COPY_2_SKETCH_R)
        extrude(amount=-BOLT_HOLE_4_COPY_2_DEPTH, mode=Mode.SUBTRACT)

    # Sketch11 → Cut-Extrude2 (cut)
    with SkipClean():  # the faces are left unmerged after this step: merging them gives an invalid solid
        with BuildSketch(Plane.XZ):
            with Locations(Location((9.128366, 61.145977, 0), (0, 0, 270))):
                Circle(SKETCH11_R)
            with Locations(Location((-26.059706, 57.209264, 0), (0, 0, 270))):
                Circle(SKETCH11_R)
        extrude(amount=-CUT_EXTRUDE2_DEPTH, mode=Mode.SUBTRACT)

    # Sketch13 → Cut-Extrude3 (cut)
    with SkipClean():  # the faces are left unmerged after this step: merging them gives an invalid solid
        with BuildSketch(Plane.XZ):
            with Locations(Location((39.7764, 41.91, 0), (0, 0, 270))):
                Circle(SKETCH13_R)
            with Locations(Location((-39.7764, 41.91, 0), (0, 0, 270))):
                Circle(SKETCH13_R)
        cut_extrude3 = extrude(amount=-CUT_EXTRUDE3_DEPTH, mode=Mode.SUBTRACT)

    # Sketch14 → Cut-Extrude4 (cut)
    with SkipClean():  # the faces are left unmerged after this step: merging them gives an invalid solid
        with BuildSketch(Plane.XZ.offset(-3.175)):
            with Locations(Location((39.7764, 41.91, 0), (0, 0, 270))):
                Circle(SKETCH14_R)
            with Locations(Location((-39.7764, 41.91, 0), (0, 0, 270))):
                Circle(SKETCH14_R)
        cut_extrude4 = extrude(amount=-CUT_EXTRUDE4_DEPTH, mode=Mode.SUBTRACT)

    # Mirror1: Cut-Extrude3, Cut-Extrude4 across plane
    with SkipClean():  # the faces are left unmerged after this step: merging them gives an invalid solid
        add(cut_extrude3.mirror(Plane.XY), mode=Mode.SUBTRACT)
        add(cut_extrude4.mirror(Plane.XY), mode=Mode.SUBTRACT)

    # Fillet3
    # the kernel refuses this fillet: 1.27 mm, written as the material it adds along each edge
    with BuildSketch(Plane(origin=(-73.818547, 6.35, 56.048132), x_dir=(0.5027895932474892, 0, 0.8644088297339543), z_dir=(0.8644088297339544, 0, -0.5027895932474892))) as fillet3_piece_1_section:
        with BuildLine():
            CenterArc((FILLET3_R, -FILLET3_R), FILLET3_R, 90, 90)
            Line((0, -FILLET3_R), (0, 0))
            Line((0, 0), (FILLET3_R, 0))
        make_face()
    fillet3_piece_1 = extrude(amount=38.502113, mode=Mode.PRIVATE)
    fillet3_piece_1 = fillet3_piece_1 & Plane(origin=(0, 6.637419, 0), x_dir=(0, 0, 1), z_dir=(0, -1, 0)) * Cylinder(89.535, 83, mode=Mode.PRIVATE)
    fillet3_piece_1 = fillet3_piece_1 - Plane(origin=(0, 6.637419, 0), x_dir=(-0.7490088761778874, 0, 0.6625599621217225), z_dir=(0, -1, 0)) * Cylinder(57.785, 83, mode=Mode.PRIVATE)
    add(fillet3_piece_1)
    with BuildSketch(Plane(origin=(73.818547, 6.35, -56.048132), x_dir=(-0.5027895932474892, 0, -0.8644088297339543), z_dir=(-0.8644088297339544, 0, 0.5027895932474892))) as fillet3_piece_2_section:
        with BuildLine():
            CenterArc((FILLET3_R, -FILLET3_R), FILLET3_R, 90, 90)
            Line((0, -FILLET3_R), (0, 0))
            Line((0, 0), (FILLET3_R, 0))
        make_face()
    fillet3_piece_2 = extrude(amount=38.502113, mode=Mode.PRIVATE)
    fillet3_piece_2 = fillet3_piece_2 - Plane(origin=(0, 6.637419, 0), x_dir=(0.7490088761778874, 0, -0.6625599621217225), z_dir=(0, -1, 0)) * Cylinder(57.785, 83, mode=Mode.PRIVATE)
    fillet3_piece_2 = fillet3_piece_2 & Plane(origin=(0, 6.637419, 0), x_dir=(0, 0, 1), z_dir=(0, -1, 0)) * Cylinder(89.535, 83, mode=Mode.PRIVATE)
    add(fillet3_piece_2)
    with BuildSketch(Plane(origin=(73.818547, 6.35, 56.048132), x_dir=(-0.5027895932474892, 0, 0.8644088297339543), z_dir=(-0.8644088297339544, 0, -0.5027895932474892))) as fillet3_piece_3_section:
        with BuildLine():
            CenterArc((FILLET3_R, FILLET3_R), FILLET3_R, 180, 90)
            Line((0, FILLET3_R), (0, 0))
            Line((0, 0), (FILLET3_R, 0))
        make_face()
    fillet3_piece_3 = extrude(amount=38.502113, mode=Mode.PRIVATE)
    fillet3_piece_3 = fillet3_piece_3 & Plane(origin=(0, 6.637418, 0), x_dir=(0, 0, 1), z_dir=(0, -1, 0)) * Cylinder(89.535, 83, mode=Mode.PRIVATE)
    fillet3_piece_3 = fillet3_piece_3 - Plane(origin=(0, 6.637418, 0), x_dir=(0.7490088761778874, 0, 0.6625599621217225), z_dir=(0, -1, 0)) * Cylinder(57.785, 83, mode=Mode.PRIVATE)
    add(fillet3_piece_3)
    with BuildSketch(Plane(origin=(-73.818547, 6.35, -56.048132), x_dir=(0.5027895932474892, 0, -0.8644088297339543), z_dir=(0.8644088297339544, 0, 0.5027895932474892))) as fillet3_piece_4_section:
        with BuildLine():
            CenterArc((FILLET3_R, FILLET3_R), FILLET3_R, 180, 90)
            Line((0, FILLET3_R), (0, 0))
            Line((0, 0), (FILLET3_R, 0))
        make_face()
    fillet3_piece_4 = extrude(amount=38.502113, mode=Mode.PRIVATE)
    fillet3_piece_4 = fillet3_piece_4 & Plane(origin=(0, 6.637418, 0), x_dir=(0, 0, 1), z_dir=(0, -1, 0)) * Cylinder(89.535, 83, mode=Mode.PRIVATE)
    fillet3_piece_4 = fillet3_piece_4 - Plane(origin=(0, 6.637418, 0), x_dir=(-0.7490088761778874, 0, -0.6625599621217225), z_dir=(0, -1, 0)) * Cylinder(57.785, 83, mode=Mode.PRIVATE)
    add(fillet3_piece_4)

    # Sketch15 → Cut-Extrude5 (cut)
    with BuildSketch(Plane.XZ):
        with Locations(Location((57.785, 0, 0), (0, 0, 270))):
            Circle(SKETCH15_R)
    cut_extrude5 = extrude(amount=-CUT_EXTRUDE5_DEPTH, mode=Mode.SUBTRACT)

    # Mirror2: Cut-Extrude5 across plane
    add(cut_extrude5.mirror(Plane(origin=(0, 0, 0), x_dir=(0, 0, 1), z_dir=(1, 0, 0))), mode=Mode.SUBTRACT)


solid = part.part
